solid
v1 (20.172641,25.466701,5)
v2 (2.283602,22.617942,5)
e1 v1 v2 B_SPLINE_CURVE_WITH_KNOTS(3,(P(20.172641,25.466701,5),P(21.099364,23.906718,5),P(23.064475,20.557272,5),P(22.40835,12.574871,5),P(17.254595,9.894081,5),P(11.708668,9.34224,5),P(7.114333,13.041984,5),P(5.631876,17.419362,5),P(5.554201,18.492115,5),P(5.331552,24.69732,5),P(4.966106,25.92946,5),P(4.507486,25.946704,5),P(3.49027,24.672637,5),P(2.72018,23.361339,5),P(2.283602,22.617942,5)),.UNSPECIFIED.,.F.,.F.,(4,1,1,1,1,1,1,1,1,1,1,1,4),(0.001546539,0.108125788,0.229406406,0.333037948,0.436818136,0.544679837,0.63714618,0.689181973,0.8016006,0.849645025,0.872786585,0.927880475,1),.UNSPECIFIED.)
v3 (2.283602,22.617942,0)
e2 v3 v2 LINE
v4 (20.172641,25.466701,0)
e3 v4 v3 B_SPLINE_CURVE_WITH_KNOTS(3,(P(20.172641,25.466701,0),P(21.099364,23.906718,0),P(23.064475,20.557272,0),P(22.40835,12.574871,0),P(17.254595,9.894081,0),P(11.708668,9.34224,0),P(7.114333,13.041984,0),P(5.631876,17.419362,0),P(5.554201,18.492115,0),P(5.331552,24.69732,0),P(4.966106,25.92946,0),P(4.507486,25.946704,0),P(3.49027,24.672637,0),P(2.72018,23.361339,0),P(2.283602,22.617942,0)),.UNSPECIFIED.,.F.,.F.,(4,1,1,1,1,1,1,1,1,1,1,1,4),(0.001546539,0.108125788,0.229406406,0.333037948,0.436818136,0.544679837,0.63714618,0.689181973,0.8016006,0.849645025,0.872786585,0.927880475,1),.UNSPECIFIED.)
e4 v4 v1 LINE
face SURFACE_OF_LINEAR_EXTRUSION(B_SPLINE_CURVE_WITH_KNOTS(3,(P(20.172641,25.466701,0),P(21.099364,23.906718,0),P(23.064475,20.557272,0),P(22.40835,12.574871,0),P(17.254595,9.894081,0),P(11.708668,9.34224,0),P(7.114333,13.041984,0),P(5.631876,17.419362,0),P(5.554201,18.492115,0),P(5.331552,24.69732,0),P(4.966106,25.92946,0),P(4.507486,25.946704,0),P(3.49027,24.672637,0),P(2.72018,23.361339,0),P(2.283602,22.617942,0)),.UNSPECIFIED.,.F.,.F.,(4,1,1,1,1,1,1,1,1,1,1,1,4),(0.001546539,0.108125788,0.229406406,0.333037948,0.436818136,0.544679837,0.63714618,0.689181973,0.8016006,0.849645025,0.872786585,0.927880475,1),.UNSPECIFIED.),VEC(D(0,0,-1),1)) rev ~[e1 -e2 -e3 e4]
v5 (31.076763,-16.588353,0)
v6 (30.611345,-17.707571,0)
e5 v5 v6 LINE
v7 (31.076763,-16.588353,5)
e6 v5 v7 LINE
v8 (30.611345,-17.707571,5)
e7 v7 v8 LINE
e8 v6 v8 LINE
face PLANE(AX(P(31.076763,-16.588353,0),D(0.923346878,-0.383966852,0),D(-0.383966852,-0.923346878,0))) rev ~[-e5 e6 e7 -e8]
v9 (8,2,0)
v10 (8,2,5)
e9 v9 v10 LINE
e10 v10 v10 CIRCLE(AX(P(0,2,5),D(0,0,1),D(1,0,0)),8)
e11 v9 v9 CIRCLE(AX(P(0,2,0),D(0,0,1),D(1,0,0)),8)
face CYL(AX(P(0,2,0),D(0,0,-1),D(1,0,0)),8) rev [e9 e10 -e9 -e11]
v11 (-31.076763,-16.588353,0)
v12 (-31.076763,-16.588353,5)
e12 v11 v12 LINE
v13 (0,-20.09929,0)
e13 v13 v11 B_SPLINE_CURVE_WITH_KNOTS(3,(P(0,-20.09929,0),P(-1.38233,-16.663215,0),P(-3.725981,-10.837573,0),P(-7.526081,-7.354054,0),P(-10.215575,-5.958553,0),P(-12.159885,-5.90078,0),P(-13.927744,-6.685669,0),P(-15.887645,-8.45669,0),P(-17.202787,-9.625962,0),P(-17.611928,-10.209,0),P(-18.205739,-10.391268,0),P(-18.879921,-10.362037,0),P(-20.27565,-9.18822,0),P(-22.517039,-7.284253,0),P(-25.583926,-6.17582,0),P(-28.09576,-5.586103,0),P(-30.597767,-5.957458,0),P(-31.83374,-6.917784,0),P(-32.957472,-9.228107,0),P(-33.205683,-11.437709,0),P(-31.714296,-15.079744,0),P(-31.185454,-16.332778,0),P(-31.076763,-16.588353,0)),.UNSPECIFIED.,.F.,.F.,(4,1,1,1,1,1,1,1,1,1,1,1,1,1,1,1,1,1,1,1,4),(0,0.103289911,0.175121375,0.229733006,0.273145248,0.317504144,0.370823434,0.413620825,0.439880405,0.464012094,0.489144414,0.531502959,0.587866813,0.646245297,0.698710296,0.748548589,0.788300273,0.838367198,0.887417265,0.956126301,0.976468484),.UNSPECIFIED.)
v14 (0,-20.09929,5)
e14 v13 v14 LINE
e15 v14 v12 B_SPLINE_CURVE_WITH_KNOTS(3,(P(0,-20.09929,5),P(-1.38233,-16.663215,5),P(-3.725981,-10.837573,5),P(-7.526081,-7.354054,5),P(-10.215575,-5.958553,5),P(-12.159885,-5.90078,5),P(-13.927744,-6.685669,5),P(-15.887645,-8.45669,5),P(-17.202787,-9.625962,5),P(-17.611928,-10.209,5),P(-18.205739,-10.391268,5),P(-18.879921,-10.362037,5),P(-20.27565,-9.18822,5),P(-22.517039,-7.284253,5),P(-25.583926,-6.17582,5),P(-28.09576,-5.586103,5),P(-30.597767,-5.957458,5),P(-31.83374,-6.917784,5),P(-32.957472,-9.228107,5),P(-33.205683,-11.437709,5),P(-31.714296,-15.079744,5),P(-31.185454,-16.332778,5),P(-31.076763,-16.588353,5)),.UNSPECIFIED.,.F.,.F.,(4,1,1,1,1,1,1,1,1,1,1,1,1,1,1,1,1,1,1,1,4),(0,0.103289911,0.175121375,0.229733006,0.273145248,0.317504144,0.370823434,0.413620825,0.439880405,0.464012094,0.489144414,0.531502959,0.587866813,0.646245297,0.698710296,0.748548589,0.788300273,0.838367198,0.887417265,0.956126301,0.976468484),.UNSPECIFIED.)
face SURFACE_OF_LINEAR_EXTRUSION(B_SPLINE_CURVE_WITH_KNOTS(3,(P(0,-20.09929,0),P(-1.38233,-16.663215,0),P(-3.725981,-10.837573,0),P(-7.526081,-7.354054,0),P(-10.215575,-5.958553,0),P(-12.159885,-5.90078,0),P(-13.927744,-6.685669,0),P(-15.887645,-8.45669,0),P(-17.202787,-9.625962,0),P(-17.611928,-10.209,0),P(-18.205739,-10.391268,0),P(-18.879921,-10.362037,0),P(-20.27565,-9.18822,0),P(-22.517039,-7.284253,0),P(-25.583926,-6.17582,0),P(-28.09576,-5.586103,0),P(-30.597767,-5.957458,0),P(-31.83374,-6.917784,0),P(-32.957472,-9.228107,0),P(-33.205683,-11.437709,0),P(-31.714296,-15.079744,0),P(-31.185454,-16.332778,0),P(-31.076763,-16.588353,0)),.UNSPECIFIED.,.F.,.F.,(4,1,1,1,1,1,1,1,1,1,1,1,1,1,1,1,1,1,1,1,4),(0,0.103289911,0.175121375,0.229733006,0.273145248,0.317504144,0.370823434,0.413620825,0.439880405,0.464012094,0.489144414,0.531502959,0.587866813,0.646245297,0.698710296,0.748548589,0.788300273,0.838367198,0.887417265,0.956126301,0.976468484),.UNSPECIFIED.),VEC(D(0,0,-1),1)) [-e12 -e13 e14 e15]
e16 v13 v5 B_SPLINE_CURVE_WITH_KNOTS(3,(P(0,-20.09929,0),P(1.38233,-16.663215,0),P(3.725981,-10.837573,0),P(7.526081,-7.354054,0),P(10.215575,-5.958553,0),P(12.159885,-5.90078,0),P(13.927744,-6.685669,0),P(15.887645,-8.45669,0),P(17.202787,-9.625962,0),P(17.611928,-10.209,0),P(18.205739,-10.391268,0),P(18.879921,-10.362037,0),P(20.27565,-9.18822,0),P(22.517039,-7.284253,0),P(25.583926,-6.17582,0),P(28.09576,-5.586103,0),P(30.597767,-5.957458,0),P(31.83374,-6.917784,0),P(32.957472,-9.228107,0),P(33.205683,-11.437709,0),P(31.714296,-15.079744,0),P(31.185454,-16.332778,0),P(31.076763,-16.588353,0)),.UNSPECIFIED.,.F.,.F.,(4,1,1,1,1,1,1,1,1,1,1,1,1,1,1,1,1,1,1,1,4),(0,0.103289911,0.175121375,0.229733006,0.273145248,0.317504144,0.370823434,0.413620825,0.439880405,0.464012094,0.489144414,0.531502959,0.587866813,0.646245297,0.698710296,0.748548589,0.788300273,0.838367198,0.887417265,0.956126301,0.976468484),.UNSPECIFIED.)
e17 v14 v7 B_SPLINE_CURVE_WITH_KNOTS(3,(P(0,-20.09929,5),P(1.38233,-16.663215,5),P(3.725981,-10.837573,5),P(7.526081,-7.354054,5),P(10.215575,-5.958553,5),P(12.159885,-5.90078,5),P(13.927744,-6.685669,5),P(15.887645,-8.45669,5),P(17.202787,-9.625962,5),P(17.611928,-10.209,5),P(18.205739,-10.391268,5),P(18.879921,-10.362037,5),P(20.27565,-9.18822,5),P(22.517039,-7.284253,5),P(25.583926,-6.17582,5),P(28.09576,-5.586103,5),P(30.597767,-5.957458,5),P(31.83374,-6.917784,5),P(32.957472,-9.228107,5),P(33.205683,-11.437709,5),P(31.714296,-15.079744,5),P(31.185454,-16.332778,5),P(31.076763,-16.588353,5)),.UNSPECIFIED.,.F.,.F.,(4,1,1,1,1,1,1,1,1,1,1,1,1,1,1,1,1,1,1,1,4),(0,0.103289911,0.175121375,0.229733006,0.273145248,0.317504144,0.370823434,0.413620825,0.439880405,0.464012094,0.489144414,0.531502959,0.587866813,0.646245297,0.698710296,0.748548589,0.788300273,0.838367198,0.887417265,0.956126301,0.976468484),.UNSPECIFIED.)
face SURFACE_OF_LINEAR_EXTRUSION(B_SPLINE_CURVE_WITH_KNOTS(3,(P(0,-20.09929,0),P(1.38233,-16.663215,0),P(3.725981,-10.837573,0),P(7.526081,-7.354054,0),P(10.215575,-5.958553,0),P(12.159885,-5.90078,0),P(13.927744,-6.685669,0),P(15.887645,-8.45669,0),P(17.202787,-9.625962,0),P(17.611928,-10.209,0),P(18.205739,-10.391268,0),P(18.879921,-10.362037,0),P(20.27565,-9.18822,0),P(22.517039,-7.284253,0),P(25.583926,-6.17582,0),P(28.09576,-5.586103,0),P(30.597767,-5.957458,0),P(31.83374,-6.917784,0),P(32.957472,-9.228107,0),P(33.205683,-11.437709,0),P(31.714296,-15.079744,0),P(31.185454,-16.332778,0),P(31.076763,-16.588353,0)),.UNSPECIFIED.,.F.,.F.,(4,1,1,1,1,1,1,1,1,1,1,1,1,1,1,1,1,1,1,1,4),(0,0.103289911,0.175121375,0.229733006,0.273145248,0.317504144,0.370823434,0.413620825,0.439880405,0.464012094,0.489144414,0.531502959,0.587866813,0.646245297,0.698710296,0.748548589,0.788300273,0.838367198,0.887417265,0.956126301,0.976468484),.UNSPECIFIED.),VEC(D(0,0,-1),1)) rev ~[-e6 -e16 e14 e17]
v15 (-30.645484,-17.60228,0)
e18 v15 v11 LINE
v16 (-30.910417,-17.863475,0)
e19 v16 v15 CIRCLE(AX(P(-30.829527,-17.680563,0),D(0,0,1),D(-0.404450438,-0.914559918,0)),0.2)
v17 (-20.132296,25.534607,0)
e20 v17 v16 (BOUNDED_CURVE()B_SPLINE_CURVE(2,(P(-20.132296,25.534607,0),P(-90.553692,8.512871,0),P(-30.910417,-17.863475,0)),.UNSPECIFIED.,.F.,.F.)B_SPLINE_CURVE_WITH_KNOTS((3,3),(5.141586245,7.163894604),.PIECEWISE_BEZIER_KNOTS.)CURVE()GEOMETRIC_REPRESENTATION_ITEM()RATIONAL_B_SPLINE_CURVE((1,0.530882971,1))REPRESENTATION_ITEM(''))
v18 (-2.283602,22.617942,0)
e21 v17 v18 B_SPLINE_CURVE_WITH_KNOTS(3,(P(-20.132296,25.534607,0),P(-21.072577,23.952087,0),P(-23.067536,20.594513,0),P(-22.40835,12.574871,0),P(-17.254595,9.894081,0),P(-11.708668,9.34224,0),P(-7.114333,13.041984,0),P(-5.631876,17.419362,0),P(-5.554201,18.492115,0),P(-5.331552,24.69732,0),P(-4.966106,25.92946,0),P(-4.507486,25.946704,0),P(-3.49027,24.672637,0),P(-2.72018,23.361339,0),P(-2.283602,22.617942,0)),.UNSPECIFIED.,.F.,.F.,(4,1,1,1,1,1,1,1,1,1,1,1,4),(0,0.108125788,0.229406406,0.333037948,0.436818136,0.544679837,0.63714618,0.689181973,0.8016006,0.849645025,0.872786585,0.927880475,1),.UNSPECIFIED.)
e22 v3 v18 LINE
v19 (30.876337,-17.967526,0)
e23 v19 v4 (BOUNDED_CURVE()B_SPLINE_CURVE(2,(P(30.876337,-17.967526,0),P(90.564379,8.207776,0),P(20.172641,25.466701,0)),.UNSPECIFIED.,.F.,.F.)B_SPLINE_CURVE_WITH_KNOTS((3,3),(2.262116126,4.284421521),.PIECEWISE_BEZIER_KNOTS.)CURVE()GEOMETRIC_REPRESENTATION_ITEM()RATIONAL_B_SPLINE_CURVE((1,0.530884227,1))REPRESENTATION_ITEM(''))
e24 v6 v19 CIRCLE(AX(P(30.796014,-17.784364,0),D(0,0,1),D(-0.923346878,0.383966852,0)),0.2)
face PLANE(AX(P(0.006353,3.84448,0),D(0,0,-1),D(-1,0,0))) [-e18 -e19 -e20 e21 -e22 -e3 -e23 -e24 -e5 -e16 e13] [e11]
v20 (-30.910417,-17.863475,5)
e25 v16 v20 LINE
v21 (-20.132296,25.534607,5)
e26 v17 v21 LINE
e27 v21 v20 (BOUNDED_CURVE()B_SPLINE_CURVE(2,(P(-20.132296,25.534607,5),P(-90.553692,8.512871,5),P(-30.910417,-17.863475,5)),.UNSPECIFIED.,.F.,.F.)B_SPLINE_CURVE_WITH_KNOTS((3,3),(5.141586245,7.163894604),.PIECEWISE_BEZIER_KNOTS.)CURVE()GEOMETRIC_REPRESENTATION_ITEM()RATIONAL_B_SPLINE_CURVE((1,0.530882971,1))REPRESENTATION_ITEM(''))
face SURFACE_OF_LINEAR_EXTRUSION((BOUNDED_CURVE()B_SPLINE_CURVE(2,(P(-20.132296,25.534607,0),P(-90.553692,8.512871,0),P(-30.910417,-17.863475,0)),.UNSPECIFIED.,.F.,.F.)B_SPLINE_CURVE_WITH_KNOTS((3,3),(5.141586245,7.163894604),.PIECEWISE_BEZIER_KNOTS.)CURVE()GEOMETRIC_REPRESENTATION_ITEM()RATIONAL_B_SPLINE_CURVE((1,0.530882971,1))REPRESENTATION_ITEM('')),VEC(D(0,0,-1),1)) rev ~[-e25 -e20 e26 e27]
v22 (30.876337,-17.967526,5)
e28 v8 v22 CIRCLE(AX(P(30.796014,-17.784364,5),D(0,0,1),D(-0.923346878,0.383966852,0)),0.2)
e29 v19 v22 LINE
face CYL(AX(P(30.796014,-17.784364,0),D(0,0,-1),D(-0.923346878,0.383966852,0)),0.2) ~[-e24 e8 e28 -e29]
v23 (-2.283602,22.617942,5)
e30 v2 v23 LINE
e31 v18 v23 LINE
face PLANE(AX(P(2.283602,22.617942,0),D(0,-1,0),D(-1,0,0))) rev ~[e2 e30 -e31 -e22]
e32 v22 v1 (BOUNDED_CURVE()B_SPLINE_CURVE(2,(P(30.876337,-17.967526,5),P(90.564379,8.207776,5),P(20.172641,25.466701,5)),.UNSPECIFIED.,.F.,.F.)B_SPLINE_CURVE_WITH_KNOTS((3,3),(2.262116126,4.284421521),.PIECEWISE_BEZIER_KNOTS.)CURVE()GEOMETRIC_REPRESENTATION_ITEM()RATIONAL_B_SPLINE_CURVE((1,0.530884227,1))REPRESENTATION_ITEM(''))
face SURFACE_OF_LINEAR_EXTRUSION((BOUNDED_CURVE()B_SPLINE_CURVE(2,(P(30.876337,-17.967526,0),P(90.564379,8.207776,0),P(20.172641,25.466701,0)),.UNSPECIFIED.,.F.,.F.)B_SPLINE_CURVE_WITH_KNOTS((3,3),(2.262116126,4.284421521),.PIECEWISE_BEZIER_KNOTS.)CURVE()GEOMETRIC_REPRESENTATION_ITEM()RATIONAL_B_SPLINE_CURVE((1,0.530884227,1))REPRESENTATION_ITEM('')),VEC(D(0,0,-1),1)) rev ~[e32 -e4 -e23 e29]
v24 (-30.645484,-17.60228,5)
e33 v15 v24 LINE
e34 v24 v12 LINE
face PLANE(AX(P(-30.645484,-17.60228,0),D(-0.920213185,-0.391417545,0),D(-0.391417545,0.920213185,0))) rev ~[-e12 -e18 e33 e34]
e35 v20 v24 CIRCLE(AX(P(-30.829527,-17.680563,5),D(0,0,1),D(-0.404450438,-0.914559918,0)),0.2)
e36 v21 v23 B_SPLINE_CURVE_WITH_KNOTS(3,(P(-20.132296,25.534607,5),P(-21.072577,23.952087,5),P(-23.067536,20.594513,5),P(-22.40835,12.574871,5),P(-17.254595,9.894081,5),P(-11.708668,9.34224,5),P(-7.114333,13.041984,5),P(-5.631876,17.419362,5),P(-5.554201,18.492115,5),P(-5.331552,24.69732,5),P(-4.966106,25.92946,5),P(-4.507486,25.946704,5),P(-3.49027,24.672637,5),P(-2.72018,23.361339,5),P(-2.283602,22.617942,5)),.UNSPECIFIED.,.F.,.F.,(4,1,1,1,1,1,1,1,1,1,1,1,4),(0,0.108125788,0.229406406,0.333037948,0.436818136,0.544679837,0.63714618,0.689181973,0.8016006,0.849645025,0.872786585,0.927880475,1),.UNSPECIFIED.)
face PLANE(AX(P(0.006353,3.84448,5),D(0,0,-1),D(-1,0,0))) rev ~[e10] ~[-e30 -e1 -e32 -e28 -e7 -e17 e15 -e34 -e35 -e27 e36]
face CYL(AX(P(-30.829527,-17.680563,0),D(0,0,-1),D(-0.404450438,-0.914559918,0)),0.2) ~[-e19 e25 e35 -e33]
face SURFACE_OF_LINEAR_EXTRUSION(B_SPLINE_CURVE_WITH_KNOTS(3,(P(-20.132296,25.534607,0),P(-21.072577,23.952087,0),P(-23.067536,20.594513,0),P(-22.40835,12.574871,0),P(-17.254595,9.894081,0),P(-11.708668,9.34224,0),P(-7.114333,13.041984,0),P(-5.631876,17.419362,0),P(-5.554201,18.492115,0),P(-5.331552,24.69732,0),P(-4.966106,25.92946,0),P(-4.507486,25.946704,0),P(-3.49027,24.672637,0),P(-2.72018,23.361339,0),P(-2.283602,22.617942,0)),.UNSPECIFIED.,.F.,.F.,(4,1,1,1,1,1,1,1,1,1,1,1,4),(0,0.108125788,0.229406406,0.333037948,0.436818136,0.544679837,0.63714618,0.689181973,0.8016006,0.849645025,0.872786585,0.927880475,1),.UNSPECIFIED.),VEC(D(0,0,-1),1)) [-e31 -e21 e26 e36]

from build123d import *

# Parameters (mm, degrees)
F0_R     = 8
F1_DEPTH = 5
F3_DEPTH = 4


with BuildPart() as f1:
    # F0 (on Top) → F1 (new body)
    with BuildSketch(Plane.XY):
        with BuildLine():
            add(Edge.make_bspline(
                [(-20.1322957873, 25.53460747), (-21.0725770911, 23.9520868943), (-23.0675364795, 20.5945126588), (-22.4083503956, 12.5748714923), (-17.2545951615, 9.8940808299), (-11.7086679234, 9.3422404959), (-7.114333286, 13.0419839582), (-5.6318764107, 17.419362352), (-5.5542005863, 18.4921153575), (-5.3315524161, 24.6973197099), (-4.9661057562, 25.9294604037), (-4.5074860116, 25.9467043834), (-3.4902695158, 24.6726371533), (-2.7201798677, 23.361339468), (-2.2836024873, 22.6179417223)],
                knots=[0, 0, 0, 0, 0.1081257875, 0.2294064064, 0.3330379483, 0.4368181362, 0.544679837, 0.6371461796, 0.6891819735, 0.8016006001, 0.8496450245, 0.8727865852, 0.9278804753, 1, 1, 1, 1], degree=3))
            add(Edge.make_bspline(
                [(-20.1322957873, 25.53460747), (-90.5536915685, 8.5128706396), (-30.9104166947, -17.8634751536)],
                knots=[5.141586245, 5.141586245, 5.141586245, 7.1638946044, 7.1638946044, 7.1638946044], degree=2, weights=[1, 0.5308829712, 1]))
            ThreePointArc((-30.9104166947, -17.8634751536), (-30.6891133476, -17.8229854876), (-30.6454839702, -17.602279661))
            Line((-30.6454839702, -17.602279661), (-31.0767631014, -16.5883528518))
            add(Edge.make_bspline(
                [(0, -20.0992897153), (-1.3823299374, -16.6632151248), (-3.7259810905, -10.8375725204), (-7.5260810857, -7.3540536255), (-10.2155748152, -5.9585527548), (-12.159885229, -5.9007804143), (-13.9277435294, -6.6856686943), (-15.8876446758, -8.4566903444), (-17.2027866447, -9.625962135), (-17.6119279245, -10.2090003219), (-18.205738536, -10.3912681874), (-18.8799205861, -10.3620367326), (-20.2756503106, -9.1882203841), (-22.5170394795, -7.2842527027), (-25.5839259266, -6.1758196411), (-28.0957601751, -5.5861032814), (-30.5977671217, -5.9574582263), (-31.8337397225, -6.9177842225), (-32.9574722494, -9.2281070864), (-33.2056830629, -11.4377087655), (-31.7142961508, -15.0797440223), (-31.1854537564, -16.3327778446), (-31.0767631014, -16.5883528518)],
                knots=[0, 0, 0, 0, 0.1032899111, 0.175121375, 0.2297330056, 0.2731452478, 0.317504144, 0.3708234335, 0.4136208246, 0.4398804052, 0.4640120942, 0.4891444143, 0.531502959, 0.5878668134, 0.6462452968, 0.6987102959, 0.7485485888, 0.788300273, 0.8383671978, 0.8874172647, 0.9561263015, 0.9764684836, 0.9764684836, 0.9764684836, 0.9764684836], degree=3))
            add(Edge.make_bspline(
                [(0, -20.0992897153), (1.3823299374, -16.6632151248), (3.7259810905, -10.8375725204), (7.5260810857, -7.3540536255), (10.2155748152, -5.9585527548), (12.159885229, -5.9007804143), (13.9277435294, -6.6856686943), (15.8876446758, -8.4566903444), (17.2027866447, -9.625962135), (17.6119279245, -10.2090003219), (18.205738536, -10.3912681874), (18.8799205861, -10.3620367326), (20.2756503106, -9.1882203841), (22.5170394795, -7.2842527027), (25.5839259266, -6.1758196411), (28.0957601751, -5.5861032814), (30.5977671217, -5.9574582263), (31.8337397225, -6.9177842225), (32.9574722494, -9.2281070864), (33.2056830629, -11.4377087655), (31.7142961508, -15.0797440223), (31.1854537564, -16.3327778446), (31.0767631014, -16.5883528518)],
                knots=[0, 0, 0, 0, 0.1032899111, 0.175121375, 0.2297330056, 0.2731452478, 0.317504144, 0.3708234335, 0.4136208246, 0.4398804052, 0.4640120942, 0.4891444143, 0.531502959, 0.5878668134, 0.6462452968, 0.6987102959, 0.7485485888, 0.788300273, 0.8383671978, 0.8874172647, 0.9561263015, 0.9764684836, 0.9764684836, 0.9764684836, 0.9764684836], degree=3))
            Line((31.0767631014, -16.5883528518), (30.6113448061, -17.7075706361))
            ThreePointArc((30.6113448061, -17.7075706361), (30.6559562722, -17.9271357895), (30.8763370515, -17.9675257836))
            add(Edge.make_bspline(
                [(30.876337032, -17.9675257922), (90.5643788989, 8.2077761409), (20.1726411379, 25.4667009928)],
                knots=[2.2621161258, 2.2621161258, 2.2621161258, 4.2844215213, 4.2844215213, 4.2844215213], degree=2, weights=[1, 0.5308842271, 1]))
            add(Edge.make_bspline(
                [(20.1726411379, 25.4667009928), (21.0993637505, 23.9067183821), (23.0644753961, 20.5572715955), (22.4083503956, 12.5748714923), (17.2545951615, 9.8940808299), (11.7086679234, 9.3422404959), (7.114333286, 13.0419839582), (5.6318764107, 17.419362352), (5.5542005863, 18.4921153575), (5.3315524161, 24.6973197099), (4.9661057562, 25.9294604037), (4.5074860116, 25.9467043834), (3.4902695158, 24.6726371533), (2.7201798677, 23.361339468), (2.2836024873, 22.6179417223)],
                knots=[0.0015465389, 0.0015465389, 0.0015465389, 0.0015465389, 0.1081257875, 0.2294064064, 0.3330379483, 0.4368181362, 0.544679837, 0.6371461796, 0.6891819735, 0.8016006001, 0.8496450245, 0.8727865852, 0.9278804753, 1, 1, 1, 1], degree=3))
            Line((2.2836024873, 22.6179417223), (0, 22.6179417223))
            Line((0, 22.6179417223), (-2.2836024873, 22.6179417223))
        make_face()
        with Locations((0, 2)):
            Circle(F0_R, mode=Mode.SUBTRACT)
    extrude(amount=F1_DEPTH)

    # F2 (on face) → F3 (join)
    with BuildSketch(Plane.XY.offset(5)):
        Polygon((4.1170143522, 20.9352653474), (-3.8109705783, 21.1286321282), (-7.0981839672, 9.9134324118), (-1.6839501914, 10.880259797), (3.0535049736, 10.5902114883), (6.9208149798, 9.3333357945), (5.8573042043, 13.5873770341), align=None)
        Polygon((3.9236498997, -7.5861448422), (-3.0375095084, -7.4894623831), (-3.4242400434, -8.843020536), (0.3463879693, -15.2240833268), align=None)
    extrude(amount=-F3_DEPTH)


solid = f1.part
